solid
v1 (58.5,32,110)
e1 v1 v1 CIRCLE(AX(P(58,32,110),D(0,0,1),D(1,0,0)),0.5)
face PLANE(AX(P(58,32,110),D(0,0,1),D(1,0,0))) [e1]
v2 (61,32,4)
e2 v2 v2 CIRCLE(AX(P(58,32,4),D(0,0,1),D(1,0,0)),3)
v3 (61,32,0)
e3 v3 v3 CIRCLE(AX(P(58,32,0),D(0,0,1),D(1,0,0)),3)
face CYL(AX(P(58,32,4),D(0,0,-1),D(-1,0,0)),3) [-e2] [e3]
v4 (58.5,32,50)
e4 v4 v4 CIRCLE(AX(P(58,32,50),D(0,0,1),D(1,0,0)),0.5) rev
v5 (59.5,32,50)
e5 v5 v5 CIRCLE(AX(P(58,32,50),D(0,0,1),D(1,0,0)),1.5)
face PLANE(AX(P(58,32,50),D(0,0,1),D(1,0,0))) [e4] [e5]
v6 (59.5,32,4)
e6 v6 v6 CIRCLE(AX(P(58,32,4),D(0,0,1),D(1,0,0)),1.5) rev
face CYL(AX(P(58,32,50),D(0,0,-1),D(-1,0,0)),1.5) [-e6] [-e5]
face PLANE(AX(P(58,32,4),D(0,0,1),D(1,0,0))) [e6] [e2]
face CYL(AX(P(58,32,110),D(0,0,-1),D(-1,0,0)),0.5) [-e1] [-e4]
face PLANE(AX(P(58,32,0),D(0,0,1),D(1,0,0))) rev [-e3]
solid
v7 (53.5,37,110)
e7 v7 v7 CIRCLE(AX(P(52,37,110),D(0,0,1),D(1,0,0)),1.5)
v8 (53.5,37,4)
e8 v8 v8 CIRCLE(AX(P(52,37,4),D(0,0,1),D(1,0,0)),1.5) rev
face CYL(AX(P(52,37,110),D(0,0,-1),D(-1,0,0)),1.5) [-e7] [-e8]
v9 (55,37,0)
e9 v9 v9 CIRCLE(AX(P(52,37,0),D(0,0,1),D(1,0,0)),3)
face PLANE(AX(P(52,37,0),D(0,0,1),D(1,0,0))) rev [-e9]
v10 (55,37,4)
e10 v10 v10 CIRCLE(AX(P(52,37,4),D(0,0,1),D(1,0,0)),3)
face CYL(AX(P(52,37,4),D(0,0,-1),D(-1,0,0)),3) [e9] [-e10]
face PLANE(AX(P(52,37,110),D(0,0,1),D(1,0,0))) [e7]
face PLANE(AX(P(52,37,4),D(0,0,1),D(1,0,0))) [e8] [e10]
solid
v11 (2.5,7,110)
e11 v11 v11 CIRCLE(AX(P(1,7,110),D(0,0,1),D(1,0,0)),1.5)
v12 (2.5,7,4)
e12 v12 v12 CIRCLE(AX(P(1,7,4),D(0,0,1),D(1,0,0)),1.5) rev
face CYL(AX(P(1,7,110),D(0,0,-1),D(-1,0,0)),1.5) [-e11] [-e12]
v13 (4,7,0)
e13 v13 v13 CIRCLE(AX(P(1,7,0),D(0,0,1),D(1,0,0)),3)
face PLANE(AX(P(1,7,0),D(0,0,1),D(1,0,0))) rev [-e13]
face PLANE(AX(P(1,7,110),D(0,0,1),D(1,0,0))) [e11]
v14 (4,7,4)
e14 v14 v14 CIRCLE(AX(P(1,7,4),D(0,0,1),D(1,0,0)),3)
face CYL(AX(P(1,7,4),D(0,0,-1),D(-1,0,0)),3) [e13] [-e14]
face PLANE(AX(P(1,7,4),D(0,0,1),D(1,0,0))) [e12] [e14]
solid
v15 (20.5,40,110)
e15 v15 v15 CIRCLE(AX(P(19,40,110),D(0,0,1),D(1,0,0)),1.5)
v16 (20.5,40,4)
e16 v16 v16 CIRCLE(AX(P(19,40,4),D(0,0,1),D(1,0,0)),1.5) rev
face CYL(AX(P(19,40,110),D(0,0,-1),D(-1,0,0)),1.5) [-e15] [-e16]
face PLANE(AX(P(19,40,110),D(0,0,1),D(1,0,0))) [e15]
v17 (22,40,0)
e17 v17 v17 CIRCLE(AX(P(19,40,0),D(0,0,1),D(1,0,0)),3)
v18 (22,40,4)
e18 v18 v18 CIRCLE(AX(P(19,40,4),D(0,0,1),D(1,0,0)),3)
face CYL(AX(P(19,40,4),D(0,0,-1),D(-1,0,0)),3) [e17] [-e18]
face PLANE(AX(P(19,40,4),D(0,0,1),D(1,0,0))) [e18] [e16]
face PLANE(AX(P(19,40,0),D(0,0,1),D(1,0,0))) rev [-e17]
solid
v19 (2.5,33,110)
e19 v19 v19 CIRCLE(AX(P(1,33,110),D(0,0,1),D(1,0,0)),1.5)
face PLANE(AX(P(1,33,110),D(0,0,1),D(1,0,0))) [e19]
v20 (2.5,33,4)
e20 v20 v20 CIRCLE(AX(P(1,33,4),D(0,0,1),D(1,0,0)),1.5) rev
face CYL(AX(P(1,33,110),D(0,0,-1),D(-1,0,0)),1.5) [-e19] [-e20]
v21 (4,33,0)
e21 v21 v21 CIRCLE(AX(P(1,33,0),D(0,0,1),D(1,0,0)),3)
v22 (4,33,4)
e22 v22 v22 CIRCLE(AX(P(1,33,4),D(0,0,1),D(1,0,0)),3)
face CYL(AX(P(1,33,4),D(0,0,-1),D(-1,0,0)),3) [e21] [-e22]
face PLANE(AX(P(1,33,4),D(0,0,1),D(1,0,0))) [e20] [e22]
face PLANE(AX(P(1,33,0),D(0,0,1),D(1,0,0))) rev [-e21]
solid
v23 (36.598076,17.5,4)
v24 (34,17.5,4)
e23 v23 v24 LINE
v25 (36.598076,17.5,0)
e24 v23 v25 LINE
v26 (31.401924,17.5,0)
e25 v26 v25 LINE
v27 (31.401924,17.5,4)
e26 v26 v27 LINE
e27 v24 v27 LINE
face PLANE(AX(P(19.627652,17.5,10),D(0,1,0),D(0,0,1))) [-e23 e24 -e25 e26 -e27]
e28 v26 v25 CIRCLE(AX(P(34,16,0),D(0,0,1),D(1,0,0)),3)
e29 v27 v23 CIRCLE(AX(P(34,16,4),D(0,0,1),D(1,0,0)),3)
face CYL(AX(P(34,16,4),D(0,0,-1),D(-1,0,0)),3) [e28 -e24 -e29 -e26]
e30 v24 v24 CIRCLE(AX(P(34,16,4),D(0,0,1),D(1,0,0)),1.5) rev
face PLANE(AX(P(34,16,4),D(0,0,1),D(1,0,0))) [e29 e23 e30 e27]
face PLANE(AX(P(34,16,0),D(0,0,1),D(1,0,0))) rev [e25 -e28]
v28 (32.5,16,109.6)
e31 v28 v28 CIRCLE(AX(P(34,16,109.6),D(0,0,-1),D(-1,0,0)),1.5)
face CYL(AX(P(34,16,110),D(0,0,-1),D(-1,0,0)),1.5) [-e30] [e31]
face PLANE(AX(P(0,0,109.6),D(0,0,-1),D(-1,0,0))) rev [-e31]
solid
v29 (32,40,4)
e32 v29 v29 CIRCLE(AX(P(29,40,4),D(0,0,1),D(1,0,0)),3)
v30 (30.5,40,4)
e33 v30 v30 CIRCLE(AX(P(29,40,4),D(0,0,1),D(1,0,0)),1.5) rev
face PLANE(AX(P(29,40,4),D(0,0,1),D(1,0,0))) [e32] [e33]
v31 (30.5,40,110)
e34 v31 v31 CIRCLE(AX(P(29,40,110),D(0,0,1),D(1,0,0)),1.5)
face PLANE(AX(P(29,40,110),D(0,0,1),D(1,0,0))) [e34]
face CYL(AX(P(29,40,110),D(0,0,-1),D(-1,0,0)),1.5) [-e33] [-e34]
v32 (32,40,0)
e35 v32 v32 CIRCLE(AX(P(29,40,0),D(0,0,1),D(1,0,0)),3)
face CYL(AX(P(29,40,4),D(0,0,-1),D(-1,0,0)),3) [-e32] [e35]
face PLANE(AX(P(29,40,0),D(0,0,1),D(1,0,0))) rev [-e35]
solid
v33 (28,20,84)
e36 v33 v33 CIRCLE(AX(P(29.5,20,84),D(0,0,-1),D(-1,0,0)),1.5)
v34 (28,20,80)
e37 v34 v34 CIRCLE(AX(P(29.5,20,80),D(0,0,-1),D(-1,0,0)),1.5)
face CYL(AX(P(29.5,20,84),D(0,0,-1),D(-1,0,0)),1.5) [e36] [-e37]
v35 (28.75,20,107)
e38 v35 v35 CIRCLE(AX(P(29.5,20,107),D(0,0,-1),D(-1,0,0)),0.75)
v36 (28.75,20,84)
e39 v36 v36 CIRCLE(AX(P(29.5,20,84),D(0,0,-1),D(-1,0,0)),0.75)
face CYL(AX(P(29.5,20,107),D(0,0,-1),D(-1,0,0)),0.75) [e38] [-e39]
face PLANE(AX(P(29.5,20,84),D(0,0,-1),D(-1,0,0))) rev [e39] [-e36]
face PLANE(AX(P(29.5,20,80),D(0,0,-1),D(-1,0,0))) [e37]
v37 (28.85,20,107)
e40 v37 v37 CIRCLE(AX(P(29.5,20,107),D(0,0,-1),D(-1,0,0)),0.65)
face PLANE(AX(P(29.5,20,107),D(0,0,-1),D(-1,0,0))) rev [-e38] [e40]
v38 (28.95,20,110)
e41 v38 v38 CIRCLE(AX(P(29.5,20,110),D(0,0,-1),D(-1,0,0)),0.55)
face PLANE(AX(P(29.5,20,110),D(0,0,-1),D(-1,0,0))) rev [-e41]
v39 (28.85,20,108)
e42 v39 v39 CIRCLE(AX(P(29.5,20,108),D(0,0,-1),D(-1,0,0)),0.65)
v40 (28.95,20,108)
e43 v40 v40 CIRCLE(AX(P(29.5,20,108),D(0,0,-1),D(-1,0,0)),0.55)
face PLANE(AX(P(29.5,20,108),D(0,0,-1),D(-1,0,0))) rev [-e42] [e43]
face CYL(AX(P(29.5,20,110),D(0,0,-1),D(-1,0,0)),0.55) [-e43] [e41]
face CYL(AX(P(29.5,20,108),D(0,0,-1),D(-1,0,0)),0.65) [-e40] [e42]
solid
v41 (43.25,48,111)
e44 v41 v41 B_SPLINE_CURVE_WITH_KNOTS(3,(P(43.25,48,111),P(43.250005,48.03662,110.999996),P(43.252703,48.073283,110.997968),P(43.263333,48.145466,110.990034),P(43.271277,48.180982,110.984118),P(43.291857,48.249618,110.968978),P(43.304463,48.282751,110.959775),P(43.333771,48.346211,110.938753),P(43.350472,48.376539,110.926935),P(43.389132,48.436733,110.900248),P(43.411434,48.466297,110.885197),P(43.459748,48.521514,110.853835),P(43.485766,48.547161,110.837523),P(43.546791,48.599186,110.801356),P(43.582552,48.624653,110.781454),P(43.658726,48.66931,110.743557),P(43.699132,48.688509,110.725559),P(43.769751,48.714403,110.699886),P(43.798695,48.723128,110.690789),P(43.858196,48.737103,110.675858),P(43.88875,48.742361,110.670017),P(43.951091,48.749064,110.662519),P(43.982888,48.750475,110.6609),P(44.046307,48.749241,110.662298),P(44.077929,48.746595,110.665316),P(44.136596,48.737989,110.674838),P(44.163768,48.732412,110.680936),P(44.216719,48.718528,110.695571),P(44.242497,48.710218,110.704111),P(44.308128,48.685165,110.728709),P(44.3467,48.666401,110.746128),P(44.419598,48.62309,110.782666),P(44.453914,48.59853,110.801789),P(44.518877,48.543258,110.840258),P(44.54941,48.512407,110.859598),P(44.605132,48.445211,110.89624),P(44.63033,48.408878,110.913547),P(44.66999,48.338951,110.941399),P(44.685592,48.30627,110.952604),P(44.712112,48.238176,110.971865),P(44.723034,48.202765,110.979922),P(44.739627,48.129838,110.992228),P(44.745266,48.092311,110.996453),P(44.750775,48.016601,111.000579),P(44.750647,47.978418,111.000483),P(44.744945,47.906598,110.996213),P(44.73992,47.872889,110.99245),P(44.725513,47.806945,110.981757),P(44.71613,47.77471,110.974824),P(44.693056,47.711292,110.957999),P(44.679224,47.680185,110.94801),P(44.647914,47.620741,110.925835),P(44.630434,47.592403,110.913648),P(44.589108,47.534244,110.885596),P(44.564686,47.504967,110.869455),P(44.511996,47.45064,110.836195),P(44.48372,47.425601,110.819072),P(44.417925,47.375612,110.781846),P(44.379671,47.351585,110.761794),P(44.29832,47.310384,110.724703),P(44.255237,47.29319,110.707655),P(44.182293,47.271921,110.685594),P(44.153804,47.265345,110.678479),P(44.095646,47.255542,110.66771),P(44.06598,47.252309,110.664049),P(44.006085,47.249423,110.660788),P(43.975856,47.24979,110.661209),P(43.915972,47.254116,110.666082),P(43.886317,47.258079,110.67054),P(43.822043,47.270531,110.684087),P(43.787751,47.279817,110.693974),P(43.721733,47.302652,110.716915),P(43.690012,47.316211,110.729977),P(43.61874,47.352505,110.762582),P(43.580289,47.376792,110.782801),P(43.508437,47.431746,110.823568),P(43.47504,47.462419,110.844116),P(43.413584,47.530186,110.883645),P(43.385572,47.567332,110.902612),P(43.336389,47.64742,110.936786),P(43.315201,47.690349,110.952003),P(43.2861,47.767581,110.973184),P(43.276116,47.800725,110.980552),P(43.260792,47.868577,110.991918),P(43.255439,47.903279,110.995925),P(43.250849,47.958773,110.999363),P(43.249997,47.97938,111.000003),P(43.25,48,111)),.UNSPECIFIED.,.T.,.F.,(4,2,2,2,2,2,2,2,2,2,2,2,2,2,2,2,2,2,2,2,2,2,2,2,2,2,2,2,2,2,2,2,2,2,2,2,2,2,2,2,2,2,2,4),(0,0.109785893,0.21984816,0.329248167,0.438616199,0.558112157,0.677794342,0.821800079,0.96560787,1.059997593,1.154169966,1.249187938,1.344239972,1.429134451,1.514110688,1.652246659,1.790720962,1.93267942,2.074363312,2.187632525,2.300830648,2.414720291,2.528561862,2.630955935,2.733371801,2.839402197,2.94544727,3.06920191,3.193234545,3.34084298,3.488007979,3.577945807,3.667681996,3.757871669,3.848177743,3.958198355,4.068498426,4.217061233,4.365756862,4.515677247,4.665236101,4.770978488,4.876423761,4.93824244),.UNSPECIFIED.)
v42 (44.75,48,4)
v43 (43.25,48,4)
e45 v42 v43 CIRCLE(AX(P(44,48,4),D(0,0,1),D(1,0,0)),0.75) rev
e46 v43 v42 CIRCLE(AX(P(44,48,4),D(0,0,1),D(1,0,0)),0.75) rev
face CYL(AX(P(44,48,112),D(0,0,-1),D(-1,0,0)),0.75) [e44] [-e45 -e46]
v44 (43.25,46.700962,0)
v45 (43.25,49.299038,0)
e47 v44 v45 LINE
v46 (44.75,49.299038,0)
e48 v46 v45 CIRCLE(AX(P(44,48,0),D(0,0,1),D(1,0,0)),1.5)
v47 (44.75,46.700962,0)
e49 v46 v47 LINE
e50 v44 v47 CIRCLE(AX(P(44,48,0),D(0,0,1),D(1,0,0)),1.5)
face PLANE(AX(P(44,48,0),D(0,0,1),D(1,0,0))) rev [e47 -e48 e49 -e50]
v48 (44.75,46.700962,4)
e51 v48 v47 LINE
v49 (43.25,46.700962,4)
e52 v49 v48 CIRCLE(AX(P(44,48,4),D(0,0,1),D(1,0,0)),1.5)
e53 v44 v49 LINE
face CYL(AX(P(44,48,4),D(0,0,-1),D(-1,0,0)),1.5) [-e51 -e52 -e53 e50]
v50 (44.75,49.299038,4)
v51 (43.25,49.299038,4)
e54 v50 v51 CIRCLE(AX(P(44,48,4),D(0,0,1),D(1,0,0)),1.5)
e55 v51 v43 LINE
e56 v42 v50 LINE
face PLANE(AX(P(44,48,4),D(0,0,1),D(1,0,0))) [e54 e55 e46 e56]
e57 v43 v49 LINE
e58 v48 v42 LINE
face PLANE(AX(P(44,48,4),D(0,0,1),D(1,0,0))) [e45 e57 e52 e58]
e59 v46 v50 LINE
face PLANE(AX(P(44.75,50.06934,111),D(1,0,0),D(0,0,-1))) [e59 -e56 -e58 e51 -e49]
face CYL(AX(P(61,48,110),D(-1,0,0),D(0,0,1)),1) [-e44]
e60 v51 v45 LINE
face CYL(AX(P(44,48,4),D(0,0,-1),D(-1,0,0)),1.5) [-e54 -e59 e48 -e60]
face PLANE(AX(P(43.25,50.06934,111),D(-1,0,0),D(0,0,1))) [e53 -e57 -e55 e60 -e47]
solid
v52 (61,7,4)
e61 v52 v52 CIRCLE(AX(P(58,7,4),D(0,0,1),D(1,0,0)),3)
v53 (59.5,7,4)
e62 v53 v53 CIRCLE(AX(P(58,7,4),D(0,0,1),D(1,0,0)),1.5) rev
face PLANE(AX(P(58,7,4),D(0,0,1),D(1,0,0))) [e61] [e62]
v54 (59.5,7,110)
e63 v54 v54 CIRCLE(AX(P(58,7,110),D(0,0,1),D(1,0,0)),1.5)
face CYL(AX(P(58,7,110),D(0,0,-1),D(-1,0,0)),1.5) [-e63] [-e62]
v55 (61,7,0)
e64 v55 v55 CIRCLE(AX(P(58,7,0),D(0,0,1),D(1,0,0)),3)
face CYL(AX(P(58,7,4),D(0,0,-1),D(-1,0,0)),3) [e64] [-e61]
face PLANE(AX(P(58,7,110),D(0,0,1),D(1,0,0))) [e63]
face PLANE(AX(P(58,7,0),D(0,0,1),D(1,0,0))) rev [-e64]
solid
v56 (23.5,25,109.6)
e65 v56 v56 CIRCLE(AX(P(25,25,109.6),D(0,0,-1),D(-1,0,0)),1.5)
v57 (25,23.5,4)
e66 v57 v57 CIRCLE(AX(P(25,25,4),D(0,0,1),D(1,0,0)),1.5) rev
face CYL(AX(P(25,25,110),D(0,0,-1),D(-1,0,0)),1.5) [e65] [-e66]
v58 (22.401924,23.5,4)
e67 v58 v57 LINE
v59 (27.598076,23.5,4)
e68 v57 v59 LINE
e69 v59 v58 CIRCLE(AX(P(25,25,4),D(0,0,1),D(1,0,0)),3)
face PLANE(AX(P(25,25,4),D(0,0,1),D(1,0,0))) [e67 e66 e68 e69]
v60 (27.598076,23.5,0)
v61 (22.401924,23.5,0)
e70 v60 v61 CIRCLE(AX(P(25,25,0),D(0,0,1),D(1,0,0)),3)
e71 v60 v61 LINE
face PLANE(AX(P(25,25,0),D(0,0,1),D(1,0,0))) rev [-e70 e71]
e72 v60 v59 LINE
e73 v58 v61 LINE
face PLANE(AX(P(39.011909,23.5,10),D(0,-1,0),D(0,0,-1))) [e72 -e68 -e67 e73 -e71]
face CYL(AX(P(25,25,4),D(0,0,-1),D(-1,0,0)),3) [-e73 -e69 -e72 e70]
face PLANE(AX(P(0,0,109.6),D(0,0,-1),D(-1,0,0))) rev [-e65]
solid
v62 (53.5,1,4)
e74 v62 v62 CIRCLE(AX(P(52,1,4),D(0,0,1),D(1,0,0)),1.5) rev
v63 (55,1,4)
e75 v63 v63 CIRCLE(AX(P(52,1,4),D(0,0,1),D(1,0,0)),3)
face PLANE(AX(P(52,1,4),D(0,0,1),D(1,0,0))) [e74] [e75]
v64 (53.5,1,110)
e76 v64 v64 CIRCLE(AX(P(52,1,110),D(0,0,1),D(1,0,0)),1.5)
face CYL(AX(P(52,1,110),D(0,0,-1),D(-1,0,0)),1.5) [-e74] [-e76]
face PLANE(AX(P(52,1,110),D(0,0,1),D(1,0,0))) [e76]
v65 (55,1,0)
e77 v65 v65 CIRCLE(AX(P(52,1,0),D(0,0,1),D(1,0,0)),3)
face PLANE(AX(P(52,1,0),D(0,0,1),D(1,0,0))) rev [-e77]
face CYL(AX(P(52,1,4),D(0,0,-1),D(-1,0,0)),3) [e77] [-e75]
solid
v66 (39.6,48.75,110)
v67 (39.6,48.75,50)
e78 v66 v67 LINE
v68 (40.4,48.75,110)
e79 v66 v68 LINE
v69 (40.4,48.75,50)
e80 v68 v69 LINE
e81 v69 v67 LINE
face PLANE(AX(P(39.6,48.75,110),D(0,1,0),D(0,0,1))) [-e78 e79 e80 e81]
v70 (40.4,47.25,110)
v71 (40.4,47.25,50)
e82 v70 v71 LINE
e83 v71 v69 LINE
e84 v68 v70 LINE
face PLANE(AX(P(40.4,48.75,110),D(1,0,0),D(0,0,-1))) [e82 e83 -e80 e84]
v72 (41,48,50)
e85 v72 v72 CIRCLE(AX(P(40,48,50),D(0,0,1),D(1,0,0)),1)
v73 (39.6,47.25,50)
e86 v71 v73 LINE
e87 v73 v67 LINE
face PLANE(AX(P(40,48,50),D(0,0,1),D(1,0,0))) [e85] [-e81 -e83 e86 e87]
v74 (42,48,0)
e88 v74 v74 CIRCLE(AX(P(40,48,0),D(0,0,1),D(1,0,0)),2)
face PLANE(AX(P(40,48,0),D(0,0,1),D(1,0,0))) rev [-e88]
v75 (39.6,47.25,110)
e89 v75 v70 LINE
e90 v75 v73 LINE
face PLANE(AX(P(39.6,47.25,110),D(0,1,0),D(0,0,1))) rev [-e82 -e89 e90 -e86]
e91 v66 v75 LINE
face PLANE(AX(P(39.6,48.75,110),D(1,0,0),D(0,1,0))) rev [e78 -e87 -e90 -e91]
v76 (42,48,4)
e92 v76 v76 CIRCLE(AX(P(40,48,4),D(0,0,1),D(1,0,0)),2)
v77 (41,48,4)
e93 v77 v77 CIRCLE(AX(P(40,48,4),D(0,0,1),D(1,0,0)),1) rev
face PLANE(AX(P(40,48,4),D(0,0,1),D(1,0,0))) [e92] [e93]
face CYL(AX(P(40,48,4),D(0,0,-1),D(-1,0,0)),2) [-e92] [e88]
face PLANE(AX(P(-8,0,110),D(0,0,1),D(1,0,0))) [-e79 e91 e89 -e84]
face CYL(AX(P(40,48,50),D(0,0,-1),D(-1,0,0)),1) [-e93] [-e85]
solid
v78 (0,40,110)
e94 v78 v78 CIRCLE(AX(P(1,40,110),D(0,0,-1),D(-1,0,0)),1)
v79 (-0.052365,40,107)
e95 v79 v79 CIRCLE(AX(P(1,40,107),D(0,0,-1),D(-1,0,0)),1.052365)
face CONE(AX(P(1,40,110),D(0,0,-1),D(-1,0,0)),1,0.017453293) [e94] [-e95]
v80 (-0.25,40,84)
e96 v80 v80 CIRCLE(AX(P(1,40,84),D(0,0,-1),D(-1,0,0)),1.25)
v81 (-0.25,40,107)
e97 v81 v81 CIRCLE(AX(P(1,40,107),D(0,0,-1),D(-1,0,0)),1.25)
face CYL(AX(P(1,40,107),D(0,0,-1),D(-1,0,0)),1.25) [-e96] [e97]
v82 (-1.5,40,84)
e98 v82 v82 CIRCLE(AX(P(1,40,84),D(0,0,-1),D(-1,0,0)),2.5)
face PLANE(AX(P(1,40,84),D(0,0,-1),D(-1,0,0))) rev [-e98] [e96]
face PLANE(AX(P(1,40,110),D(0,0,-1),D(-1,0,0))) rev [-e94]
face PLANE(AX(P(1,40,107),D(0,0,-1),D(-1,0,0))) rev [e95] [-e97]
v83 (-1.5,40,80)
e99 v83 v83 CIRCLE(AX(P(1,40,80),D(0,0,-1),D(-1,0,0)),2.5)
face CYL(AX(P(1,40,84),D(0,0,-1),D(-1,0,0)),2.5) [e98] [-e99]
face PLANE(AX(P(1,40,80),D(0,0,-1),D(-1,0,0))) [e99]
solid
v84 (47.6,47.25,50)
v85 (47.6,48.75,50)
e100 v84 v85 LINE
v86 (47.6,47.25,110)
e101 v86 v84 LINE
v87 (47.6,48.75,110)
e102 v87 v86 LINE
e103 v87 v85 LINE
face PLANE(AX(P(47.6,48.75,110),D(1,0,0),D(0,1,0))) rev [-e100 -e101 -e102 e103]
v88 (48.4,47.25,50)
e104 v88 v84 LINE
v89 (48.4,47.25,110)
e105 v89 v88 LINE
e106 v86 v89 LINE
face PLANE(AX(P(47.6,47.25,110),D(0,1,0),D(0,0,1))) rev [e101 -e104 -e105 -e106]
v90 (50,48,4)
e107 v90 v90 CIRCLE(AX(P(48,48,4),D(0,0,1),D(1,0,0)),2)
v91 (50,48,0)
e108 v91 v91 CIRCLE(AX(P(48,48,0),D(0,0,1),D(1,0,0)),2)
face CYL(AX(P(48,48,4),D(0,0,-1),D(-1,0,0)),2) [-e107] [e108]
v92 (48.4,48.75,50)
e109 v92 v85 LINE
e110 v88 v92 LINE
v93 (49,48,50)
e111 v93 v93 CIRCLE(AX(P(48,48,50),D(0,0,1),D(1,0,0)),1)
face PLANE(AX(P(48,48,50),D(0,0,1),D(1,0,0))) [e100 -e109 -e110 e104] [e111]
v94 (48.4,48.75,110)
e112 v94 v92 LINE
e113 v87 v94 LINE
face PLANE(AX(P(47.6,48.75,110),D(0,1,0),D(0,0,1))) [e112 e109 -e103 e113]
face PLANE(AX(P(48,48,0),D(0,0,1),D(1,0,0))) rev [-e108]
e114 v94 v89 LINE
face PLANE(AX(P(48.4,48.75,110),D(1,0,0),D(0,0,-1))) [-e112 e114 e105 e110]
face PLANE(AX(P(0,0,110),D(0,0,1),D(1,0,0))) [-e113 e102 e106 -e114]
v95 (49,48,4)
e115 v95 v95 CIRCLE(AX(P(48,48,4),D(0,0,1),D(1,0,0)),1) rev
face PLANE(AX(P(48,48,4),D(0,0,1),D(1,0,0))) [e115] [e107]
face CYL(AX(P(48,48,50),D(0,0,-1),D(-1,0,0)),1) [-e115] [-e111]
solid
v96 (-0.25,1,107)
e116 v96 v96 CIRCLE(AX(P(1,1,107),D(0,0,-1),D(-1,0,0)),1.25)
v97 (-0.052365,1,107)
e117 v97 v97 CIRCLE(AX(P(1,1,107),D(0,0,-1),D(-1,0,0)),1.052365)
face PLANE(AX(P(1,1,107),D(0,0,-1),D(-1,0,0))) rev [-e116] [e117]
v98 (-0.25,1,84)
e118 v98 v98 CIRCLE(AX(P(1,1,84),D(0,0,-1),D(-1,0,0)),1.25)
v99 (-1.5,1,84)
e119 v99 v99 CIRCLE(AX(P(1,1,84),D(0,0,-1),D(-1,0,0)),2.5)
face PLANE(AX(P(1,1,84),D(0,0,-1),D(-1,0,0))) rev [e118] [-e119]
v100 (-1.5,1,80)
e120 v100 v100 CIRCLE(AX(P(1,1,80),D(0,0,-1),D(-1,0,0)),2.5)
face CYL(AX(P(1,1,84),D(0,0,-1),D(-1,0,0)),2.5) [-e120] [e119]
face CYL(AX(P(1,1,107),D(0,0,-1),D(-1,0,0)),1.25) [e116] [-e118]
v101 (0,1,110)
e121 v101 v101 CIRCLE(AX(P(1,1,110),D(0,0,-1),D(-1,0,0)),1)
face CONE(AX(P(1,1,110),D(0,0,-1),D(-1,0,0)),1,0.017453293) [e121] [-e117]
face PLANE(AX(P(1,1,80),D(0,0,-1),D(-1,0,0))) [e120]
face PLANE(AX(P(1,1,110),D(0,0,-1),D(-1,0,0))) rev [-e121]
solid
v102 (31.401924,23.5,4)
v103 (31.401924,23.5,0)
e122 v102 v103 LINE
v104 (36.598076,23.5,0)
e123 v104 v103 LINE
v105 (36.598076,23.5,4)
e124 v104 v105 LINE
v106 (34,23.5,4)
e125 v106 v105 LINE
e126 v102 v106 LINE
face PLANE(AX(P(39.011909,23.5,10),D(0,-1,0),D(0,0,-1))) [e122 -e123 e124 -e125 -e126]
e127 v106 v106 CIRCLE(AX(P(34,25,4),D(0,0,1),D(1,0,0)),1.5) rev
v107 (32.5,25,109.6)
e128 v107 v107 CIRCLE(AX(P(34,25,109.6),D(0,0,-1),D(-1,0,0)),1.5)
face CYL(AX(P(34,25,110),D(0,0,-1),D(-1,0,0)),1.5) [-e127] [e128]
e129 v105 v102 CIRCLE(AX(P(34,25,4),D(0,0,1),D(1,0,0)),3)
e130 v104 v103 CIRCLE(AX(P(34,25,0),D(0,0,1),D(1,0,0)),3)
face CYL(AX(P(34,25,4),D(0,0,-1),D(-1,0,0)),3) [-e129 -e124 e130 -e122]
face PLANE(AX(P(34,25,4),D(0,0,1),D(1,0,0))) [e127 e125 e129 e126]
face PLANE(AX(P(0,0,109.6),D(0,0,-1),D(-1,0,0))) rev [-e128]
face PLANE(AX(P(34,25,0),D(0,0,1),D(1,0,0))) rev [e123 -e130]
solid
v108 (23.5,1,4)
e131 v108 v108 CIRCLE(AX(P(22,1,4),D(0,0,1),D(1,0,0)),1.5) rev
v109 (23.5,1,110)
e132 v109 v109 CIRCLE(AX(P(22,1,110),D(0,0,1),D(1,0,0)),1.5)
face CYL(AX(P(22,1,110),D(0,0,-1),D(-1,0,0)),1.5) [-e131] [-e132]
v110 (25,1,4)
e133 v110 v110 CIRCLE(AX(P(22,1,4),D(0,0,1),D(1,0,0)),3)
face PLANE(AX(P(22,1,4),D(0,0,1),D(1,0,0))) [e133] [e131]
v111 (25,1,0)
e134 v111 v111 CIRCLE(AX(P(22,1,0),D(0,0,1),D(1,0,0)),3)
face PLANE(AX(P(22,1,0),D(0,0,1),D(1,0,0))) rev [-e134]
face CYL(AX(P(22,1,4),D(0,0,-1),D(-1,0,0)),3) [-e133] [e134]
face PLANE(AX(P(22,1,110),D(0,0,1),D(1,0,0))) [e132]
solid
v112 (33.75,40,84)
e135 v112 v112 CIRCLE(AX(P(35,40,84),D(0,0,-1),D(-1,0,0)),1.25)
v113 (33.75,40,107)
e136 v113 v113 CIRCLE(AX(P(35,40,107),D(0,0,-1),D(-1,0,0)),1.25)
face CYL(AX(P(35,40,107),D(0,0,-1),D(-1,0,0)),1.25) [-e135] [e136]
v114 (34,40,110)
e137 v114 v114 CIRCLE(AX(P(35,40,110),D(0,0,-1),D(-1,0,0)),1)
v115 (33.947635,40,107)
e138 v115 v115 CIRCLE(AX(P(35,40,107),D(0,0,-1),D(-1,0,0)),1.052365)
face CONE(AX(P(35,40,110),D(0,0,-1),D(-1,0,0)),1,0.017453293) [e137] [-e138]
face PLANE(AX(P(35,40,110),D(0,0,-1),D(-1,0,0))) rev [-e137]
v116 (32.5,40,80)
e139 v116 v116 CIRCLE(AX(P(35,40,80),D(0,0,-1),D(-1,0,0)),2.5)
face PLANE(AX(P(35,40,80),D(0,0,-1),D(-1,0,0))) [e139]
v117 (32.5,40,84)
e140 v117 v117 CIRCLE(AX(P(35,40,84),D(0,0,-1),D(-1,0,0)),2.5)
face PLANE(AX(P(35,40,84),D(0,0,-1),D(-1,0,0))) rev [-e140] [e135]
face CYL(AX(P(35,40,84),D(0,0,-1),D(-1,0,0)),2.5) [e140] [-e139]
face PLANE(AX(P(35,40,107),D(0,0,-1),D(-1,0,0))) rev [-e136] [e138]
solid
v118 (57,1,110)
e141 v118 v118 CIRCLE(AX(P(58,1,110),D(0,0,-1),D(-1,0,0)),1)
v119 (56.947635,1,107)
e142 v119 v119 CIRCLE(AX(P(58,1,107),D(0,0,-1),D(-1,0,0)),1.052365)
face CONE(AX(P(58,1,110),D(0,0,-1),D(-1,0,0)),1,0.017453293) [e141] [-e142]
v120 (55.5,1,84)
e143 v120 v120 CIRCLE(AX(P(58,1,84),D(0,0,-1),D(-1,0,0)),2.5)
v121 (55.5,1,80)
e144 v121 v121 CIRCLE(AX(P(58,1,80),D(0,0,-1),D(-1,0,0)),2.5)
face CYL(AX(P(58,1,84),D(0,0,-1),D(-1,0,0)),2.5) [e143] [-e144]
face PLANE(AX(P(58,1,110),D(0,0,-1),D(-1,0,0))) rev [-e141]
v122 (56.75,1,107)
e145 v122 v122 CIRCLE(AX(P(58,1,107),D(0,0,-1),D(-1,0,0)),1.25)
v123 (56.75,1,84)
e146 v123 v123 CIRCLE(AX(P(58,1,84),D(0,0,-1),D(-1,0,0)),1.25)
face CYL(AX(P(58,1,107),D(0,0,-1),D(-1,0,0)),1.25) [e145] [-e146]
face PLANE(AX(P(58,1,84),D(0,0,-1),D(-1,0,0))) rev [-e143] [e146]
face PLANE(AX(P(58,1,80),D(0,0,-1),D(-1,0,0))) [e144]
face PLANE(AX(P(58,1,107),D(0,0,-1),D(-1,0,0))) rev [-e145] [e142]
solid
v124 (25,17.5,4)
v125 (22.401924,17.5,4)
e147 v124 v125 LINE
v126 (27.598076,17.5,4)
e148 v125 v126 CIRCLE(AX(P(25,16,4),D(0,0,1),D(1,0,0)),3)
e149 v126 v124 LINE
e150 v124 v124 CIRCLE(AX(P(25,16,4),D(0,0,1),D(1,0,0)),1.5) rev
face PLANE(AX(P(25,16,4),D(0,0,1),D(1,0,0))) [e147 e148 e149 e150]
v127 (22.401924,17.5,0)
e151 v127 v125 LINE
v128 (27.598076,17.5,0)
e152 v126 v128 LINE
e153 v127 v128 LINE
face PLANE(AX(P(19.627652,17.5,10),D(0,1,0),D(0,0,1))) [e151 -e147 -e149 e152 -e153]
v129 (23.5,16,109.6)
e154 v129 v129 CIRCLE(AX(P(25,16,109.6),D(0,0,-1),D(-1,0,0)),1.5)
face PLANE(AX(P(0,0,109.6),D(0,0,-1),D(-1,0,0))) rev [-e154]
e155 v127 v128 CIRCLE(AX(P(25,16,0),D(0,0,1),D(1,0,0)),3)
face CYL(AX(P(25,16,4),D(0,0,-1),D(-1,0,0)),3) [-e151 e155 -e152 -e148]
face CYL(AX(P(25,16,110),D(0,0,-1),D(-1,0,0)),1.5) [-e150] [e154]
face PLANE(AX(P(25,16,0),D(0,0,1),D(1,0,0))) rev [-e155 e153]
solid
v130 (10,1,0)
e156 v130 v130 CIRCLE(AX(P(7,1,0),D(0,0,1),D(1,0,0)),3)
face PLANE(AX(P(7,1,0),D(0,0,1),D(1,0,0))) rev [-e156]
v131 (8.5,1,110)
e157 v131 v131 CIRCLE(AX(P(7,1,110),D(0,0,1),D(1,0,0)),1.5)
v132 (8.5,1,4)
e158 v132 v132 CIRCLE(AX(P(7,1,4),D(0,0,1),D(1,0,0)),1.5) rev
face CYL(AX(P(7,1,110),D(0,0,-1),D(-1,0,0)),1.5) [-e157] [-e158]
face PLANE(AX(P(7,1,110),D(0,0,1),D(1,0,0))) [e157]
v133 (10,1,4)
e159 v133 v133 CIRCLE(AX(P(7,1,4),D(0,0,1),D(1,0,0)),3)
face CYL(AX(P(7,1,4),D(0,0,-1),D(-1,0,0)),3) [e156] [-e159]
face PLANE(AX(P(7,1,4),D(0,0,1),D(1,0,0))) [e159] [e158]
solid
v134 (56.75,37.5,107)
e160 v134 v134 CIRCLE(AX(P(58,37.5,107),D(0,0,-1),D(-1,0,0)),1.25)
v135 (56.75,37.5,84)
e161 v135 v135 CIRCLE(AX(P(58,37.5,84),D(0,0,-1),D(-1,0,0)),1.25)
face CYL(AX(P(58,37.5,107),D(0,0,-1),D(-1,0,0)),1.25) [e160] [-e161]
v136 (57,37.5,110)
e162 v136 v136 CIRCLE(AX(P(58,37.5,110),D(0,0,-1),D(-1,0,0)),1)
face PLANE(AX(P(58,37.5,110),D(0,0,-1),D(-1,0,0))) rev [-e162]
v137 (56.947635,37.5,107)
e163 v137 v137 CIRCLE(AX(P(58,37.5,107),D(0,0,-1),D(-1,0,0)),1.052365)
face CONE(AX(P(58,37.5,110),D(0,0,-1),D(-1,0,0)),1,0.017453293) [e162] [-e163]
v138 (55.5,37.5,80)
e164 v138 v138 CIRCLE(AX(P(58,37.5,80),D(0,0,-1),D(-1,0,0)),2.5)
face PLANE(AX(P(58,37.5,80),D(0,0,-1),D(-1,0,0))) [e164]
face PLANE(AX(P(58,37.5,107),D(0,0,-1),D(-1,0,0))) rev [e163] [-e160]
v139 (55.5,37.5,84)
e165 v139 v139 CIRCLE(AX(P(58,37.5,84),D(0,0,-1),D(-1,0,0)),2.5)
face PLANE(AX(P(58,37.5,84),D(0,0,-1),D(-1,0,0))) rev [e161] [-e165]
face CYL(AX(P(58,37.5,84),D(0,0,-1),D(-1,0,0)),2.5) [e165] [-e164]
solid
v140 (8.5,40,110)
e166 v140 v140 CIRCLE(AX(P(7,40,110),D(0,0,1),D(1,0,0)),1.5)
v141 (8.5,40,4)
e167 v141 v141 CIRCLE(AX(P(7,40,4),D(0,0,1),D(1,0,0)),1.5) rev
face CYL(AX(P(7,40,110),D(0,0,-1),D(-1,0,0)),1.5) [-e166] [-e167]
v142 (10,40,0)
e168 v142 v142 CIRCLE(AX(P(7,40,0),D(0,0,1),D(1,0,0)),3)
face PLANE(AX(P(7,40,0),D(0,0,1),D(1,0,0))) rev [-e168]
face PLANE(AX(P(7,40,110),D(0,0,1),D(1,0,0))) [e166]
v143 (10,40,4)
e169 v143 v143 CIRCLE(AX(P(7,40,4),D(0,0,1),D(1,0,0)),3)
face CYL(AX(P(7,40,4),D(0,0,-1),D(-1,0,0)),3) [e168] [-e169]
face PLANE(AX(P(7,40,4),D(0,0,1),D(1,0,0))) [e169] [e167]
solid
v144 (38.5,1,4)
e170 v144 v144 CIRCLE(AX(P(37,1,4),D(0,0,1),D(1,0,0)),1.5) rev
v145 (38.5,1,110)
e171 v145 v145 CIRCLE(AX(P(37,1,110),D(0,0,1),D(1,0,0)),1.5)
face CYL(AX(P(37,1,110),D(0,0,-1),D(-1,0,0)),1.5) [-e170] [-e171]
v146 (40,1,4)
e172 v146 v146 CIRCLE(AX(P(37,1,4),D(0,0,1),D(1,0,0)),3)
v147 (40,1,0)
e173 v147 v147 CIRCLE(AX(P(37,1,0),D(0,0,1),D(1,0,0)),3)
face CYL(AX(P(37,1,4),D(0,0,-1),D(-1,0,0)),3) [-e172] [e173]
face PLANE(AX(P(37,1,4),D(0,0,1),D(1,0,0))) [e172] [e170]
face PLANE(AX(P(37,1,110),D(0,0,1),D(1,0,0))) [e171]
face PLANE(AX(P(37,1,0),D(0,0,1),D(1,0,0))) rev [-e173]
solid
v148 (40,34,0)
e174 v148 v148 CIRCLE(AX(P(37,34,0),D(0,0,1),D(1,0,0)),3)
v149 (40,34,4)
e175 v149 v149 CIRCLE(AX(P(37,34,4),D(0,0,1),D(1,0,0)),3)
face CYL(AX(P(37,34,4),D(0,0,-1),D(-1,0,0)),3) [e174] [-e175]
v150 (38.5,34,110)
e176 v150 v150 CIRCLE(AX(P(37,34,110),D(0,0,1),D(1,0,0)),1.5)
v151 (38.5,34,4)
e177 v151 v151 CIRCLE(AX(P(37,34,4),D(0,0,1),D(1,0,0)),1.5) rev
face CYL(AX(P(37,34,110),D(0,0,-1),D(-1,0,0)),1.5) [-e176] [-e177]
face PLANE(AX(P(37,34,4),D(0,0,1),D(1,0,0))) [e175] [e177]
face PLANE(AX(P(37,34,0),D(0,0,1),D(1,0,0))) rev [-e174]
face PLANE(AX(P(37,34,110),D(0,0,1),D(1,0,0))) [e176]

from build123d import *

# Parameters (mm, degrees)
SKETCH_1_R                     = 3
EXTRUDE_1_DEPTH                = 4
SKETCH_2_R                     = 1.5
EXTRUDE_2_DEPTH                = 110
PATTERN_SKETCH_1_OUTLINE_R     = 1.5
PATTERN_SKETCH_1_DEPTH         = 110
PATTERN_SKETCH_1_2_OUTLINE_R   = 3
PATTERN_SKETCH_1_2_OUTLINE_R_2 = 1.5
PATTERN_SKETCH_1_2_DEPTH       = 4
SKETCH_4_R                     = 3
EXTRUDE_3_DEPTH                = 4
SKETCH_5_R                     = 1.5
EXTRUDE_4_DEPTH                = 50
SKETCH_8_R                     = 0.5
EXTRUDE_5_DEPTH                = 110
SKETCH_6_W                     = 40
SKETCH_6_H                     = 20
CUT_EXTRUDE_1_DEPTH            = 0.4
SKETCH_35_W                    = 19.384257682
SKETCH_35_H                    = 6
CUT_EXTRUDE_10_DEPTH           = 10
SKETCH_20_R                    = 2.5
EXTRUDE_8_DEPTH                = 4
SKETCH_19_R                    = 1.25
EXTRUDE_9_DEPTH                = 27
SKETCH_21_R                    = 1
EXTRUDE_10_DEPTH               = 30
DRAFT_1_ANGLE                  = 1
SKETCH_23_R                    = 1.5
EXTRUDE_11_DEPTH               = 4
SKETCH_24_R                    = 0.75
EXTRUDE_12_DEPTH               = 112
CUT_EXTRUDE_8_DEPTH            = 137.803691471
SKETCH_25_R                    = 1.5
EXTRUDE_13_DEPTH               = 4
SKETCH_26_R                    = 0.75
EXTRUDE_14_DEPTH               = 27
SKETCH_27_R                    = 0.65
EXTRUDE_15_DEPTH               = 28
SKETCH_28_R                    = 0.55
EXTRUDE_16_DEPTH               = 30
SKETCH_30_R                    = 2
EXTRUDE_17_DEPTH               = 4
SKETCH_31_R                    = 1
EXTRUDE_18_DEPTH               = 50
SKETCH_32_W                    = 0.8
SKETCH_32_H                    = 1.5
EXTRUDE_19_DEPTH               = 110
PATTERN_SKETCH_4_OUTLINE_R     = 1
PATTERN_SKETCH_4_DEPTH         = 50
PATTERN_START                  = 50
PATTERN_SKETCH_4_2_OUTLINE_W   = 0.8
PATTERN_SKETCH_4_2_OUTLINE_H   = 1.5
PATTERN_SKETCH_4_2_DEPTH       = 60
PATTERN_SKETCH_4_3_OUTLINE_R   = 2
PATTERN_SKETCH_4_3_OUTLINE_R_2 = 1
PATTERN_SKETCH_4_3_DEPTH       = 4
CUT_EXTRUDE_START              = 76
CUT_EXTRUDE_9_DEPTH            = 4


# Read off the part's stored shape, not the designer's step: ｽｹｯﾁ-ﾊﾟﾀｰﾝ1, ｽｹｯﾁ-ﾊﾟﾀｰﾝ3, ｽｹｯﾁ-ﾊﾟﾀｰﾝ4, ｶｯﾄ - 押し出し9
with BuildPart() as part:
    # ｽｹｯﾁ1 → ﾎﾞｽ - 押し出し1 (new body)
    with BuildSketch(Plane.XY):
        with Locations((1, 7)):
            Circle(SKETCH_1_R)
    extrude(amount=EXTRUDE_1_DEPTH)

    # ｽｹｯﾁ2 → ﾎﾞｽ - 押し出し2 (add)
    with BuildSketch(Plane.XY):
        with Locations((1, 7)):
            Circle(SKETCH_2_R)
    extrude(amount=EXTRUDE_2_DEPTH)


with BuildPart() as body_2:
    # ｽｹｯﾁ-ﾊﾟﾀｰﾝ1 outline → ｽｹｯﾁ-ﾊﾟﾀｰﾝ1 (new body)
    with BuildSketch(Plane.XY):
        with Locations((1, 33)):
            Circle(PATTERN_SKETCH_1_OUTLINE_R)
        with Locations((34, 25)):
            Circle(PATTERN_SKETCH_1_OUTLINE_R)
        with Locations((34, 16)):
            Circle(PATTERN_SKETCH_1_OUTLINE_R)
        with Locations((25, 16)):
            Circle(PATTERN_SKETCH_1_OUTLINE_R)
        with Locations((37, 34)):
            Circle(PATTERN_SKETCH_1_OUTLINE_R)
        with Locations((25, 25)):
            Circle(PATTERN_SKETCH_1_OUTLINE_R)
        with Locations((58, 7)):
            Circle(PATTERN_SKETCH_1_OUTLINE_R)
        with Locations((52, 37)):
            Circle(PATTERN_SKETCH_1_OUTLINE_R)
        with Locations((29, 40)):
            Circle(PATTERN_SKETCH_1_OUTLINE_R)
        with Locations((19, 40)):
            Circle(PATTERN_SKETCH_1_OUTLINE_R)
        with Locations((7, 40)):
            Circle(PATTERN_SKETCH_1_OUTLINE_R)
        with Locations((52, 1)):
            Circle(PATTERN_SKETCH_1_OUTLINE_R)
        with Locations((37, 1)):
            Circle(PATTERN_SKETCH_1_OUTLINE_R)
        with Locations((22, 1)):
            Circle(PATTERN_SKETCH_1_OUTLINE_R)
        with Locations((7, 1)):
            Circle(PATTERN_SKETCH_1_OUTLINE_R)
    extrude(amount=PATTERN_SKETCH_1_DEPTH)

    # Pattern Sketch 1 2 outline → Pattern Sketch 1 2 (add)
    # profile 1 of 15: a face of its own
    with BuildSketch(Plane.XY):
        with Locations((1, 33)):
            Circle(PATTERN_SKETCH_1_2_OUTLINE_R)
        with Locations((1, 33)):
            Circle(PATTERN_SKETCH_1_2_OUTLINE_R_2, mode=Mode.SUBTRACT)
    # profile 2 of 15: a face of its own
    with BuildSketch(Plane.XY):
        with Locations((34, 25)):
            Circle(PATTERN_SKETCH_1_2_OUTLINE_R)
        with Locations((34, 25)):
            Circle(PATTERN_SKETCH_1_2_OUTLINE_R_2, mode=Mode.SUBTRACT)
    # profile 3 of 15: a face of its own
    with BuildSketch(Plane.XY):
        with Locations((34, 16)):
            Circle(PATTERN_SKETCH_1_2_OUTLINE_R)
        with Locations((34, 16)):
            Circle(PATTERN_SKETCH_1_2_OUTLINE_R_2, mode=Mode.SUBTRACT)
    # profile 4 of 15: a face of its own
    with BuildSketch(Plane.XY):
        with Locations((25, 16)):
            Circle(PATTERN_SKETCH_1_2_OUTLINE_R)
        with Locations((25, 16)):
            Circle(PATTERN_SKETCH_1_2_OUTLINE_R_2, mode=Mode.SUBTRACT)
    # profile 5 of 15: a face of its own
    with BuildSketch(Plane.XY):
        with Locations((37, 34)):
            Circle(PATTERN_SKETCH_1_2_OUTLINE_R)
        with Locations((37, 34)):
            Circle(PATTERN_SKETCH_1_2_OUTLINE_R_2, mode=Mode.SUBTRACT)
    # profile 6 of 15: a face of its own
    with BuildSketch(Plane.XY):
        with Locations((25, 25)):
            Circle(PATTERN_SKETCH_1_2_OUTLINE_R)
        with Locations((25, 25)):
            Circle(PATTERN_SKETCH_1_2_OUTLINE_R_2, mode=Mode.SUBTRACT)
    # profile 7 of 15: a face of its own
    with BuildSketch(Plane.XY):
        with Locations((58, 7)):
            Circle(PATTERN_SKETCH_1_2_OUTLINE_R)
        with Locations((58, 7)):
            Circle(PATTERN_SKETCH_1_2_OUTLINE_R_2, mode=Mode.SUBTRACT)
    # profile 8 of 15: a face of its own
    with BuildSketch(Plane.XY):
        with Locations((52, 37)):
            Circle(PATTERN_SKETCH_1_2_OUTLINE_R)
        with Locations((52, 37)):
            Circle(PATTERN_SKETCH_1_2_OUTLINE_R_2, mode=Mode.SUBTRACT)
    # profile 9 of 15: a face of its own
    with BuildSketch(Plane.XY):
        with Locations((29, 40)):
            Circle(PATTERN_SKETCH_1_2_OUTLINE_R)
        with Locations((29, 40)):
            Circle(PATTERN_SKETCH_1_2_OUTLINE_R_2, mode=Mode.SUBTRACT)
    # profile 10 of 15: a face of its own
    with BuildSketch(Plane.XY):
        with Locations((19, 40)):
            Circle(PATTERN_SKETCH_1_2_OUTLINE_R)
        with Locations((19, 40)):
            Circle(PATTERN_SKETCH_1_2_OUTLINE_R_2, mode=Mode.SUBTRACT)
    # profile 11 of 15: a face of its own
    with BuildSketch(Plane.XY):
        with Locations((7, 40)):
            Circle(PATTERN_SKETCH_1_2_OUTLINE_R)
        with Locations((7, 40)):
            Circle(PATTERN_SKETCH_1_2_OUTLINE_R_2, mode=Mode.SUBTRACT)
    # profile 12 of 15: a face of its own
    with BuildSketch(Plane.XY):
        with Locations((52, 1)):
            Circle(PATTERN_SKETCH_1_2_OUTLINE_R)
        with Locations((52, 1)):
            Circle(PATTERN_SKETCH_1_2_OUTLINE_R_2, mode=Mode.SUBTRACT)
    # profile 13 of 15: a face of its own
    with BuildSketch(Plane.XY):
        with Locations((37, 1)):
            Circle(PATTERN_SKETCH_1_2_OUTLINE_R)
        with Locations((37, 1)):
            Circle(PATTERN_SKETCH_1_2_OUTLINE_R_2, mode=Mode.SUBTRACT)
    # profile 14 of 15: a face of its own
    with BuildSketch(Plane.XY):
        with Locations((22, 1)):
            Circle(PATTERN_SKETCH_1_2_OUTLINE_R)
        with Locations((22, 1)):
            Circle(PATTERN_SKETCH_1_2_OUTLINE_R_2, mode=Mode.SUBTRACT)
    # profile 15 of 15: a face of its own
    with BuildSketch(Plane.XY):
        with Locations((7, 1)):
            Circle(PATTERN_SKETCH_1_2_OUTLINE_R)
        with Locations((7, 1)):
            Circle(PATTERN_SKETCH_1_2_OUTLINE_R_2, mode=Mode.SUBTRACT)
    extrude(amount=PATTERN_SKETCH_1_2_DEPTH)

    # ｽｹｯﾁ6 → ｶｯﾄ - 押し出し1 (cut)
    with BuildSketch(Plane.XY.offset(110)):
        with Locations((30, 20)):
            Rectangle(SKETCH_6_W, SKETCH_6_H)
    extrude(amount=-CUT_EXTRUDE_1_DEPTH, mode=Mode.SUBTRACT)

    # ｽｹｯﾁ35 → ｶｯﾄ - 押し出し10 (cut)
    with BuildSketch(Plane.XY):
        with Locations((29.319780458, 20.5)):
            Rectangle(SKETCH_35_W, SKETCH_35_H)
    extrude(amount=CUT_EXTRUDE_10_DEPTH, mode=Mode.SUBTRACT)


with BuildPart() as body_3:
    # ｽｹｯﾁ4 → ﾎﾞｽ - 押し出し3 (new body)
    with BuildSketch(Plane.XY):
        with Locations((58, 32)):
            Circle(SKETCH_4_R)
    extrude(amount=EXTRUDE_3_DEPTH)

    # ｽｹｯﾁ5 → ﾎﾞｽ - 押し出し4 (add)
    with BuildSketch(Plane.XY):
        with Locations((58, 32)):
            Circle(SKETCH_5_R)
    extrude(amount=EXTRUDE_4_DEPTH)

    # ｽｹｯﾁ8 → ﾎﾞｽ - 押し出し5 (add)
    with BuildSketch(Plane.XY):
        with Locations((58, 32)):
            Circle(SKETCH_8_R)
    extrude(amount=EXTRUDE_5_DEPTH)


with BuildPart() as body_4:
    # ｽｹｯﾁ20 → ﾎﾞｽ - 押し出し8 (new body)
    with BuildSketch(Plane(origin=(0, 0, 80), x_dir=(-1, 0, 0), z_dir=(0, 0, -1))):
        with Locations((-1, 1)):
            Circle(SKETCH_20_R)
    extrude(amount=-EXTRUDE_8_DEPTH)

    # ｽｹｯﾁ19 → ﾎﾞｽ - 押し出し9 (add)
    with BuildSketch(Plane(origin=(0, 0, 80), x_dir=(-1, 0, 0), z_dir=(0, 0, -1))):
        with Locations((-1, 1)):
            Circle(SKETCH_19_R)
    extrude(amount=-EXTRUDE_9_DEPTH)

    # ｽｹｯﾁ21 → ﾎﾞｽ - 押し出し10 (add)
    with BuildSketch(Plane(origin=(0, 0, 80), x_dir=(-1, 0, 0), z_dir=(0, 0, -1))):
        with Locations((-1, 1)):
            Circle(SKETCH_21_R)
    extrude(amount=-EXTRUDE_10_DEPTH)

    # 抜き勾配1
    draft_1_faces = [body_4.faces().sort_by_distance(p)[0] for p in [
        (2, 1, 108.5),
    ]]
    draft(draft_1_faces, Plane(origin=(1, 1, 110), x_dir=(1, 0, 0), z_dir=(0, 0, 1)), DRAFT_1_ANGLE)


with BuildPart() as body_5:
    # ｽｹｯﾁ-ﾊﾟﾀｰﾝ3 outline → ｽｹｯﾁ-ﾊﾟﾀｰﾝ3 (revolve)
    with BuildSketch(Plane(origin=(35, 40, 0), x_dir=(1, 0, 0), z_dir=(0, -1, 0))):
        Polygon((2.5, 80), (2.5, 84), (1.25, 84), (1.25, 107), (1.052365195, 107), (1, 110), (0, 110), (0, 80), align=None)
    revolve(axis=Axis((35, 40, 0), (0, 0, 1)))


with BuildPart() as body_6:
    # Pattern Sketch 3 2 outline → Pattern Sketch 3 2 (revolve)
    with BuildSketch(Plane(origin=(58, 1, 0), x_dir=(1, 0, 0), z_dir=(0, -1, 0))):
        Polygon((0, 80), (2.5, 80), (2.5, 84), (1.25, 84), (1.25, 107), (1.052365195, 107), (1, 110), (0, 110), align=None)
    revolve(axis=Axis((58, 1, 0), (0, 0, 1)))


with BuildPart() as body_7:
    # Pattern Sketch 3 3 outline → Pattern Sketch 3 3 (revolve)
    with BuildSketch(Plane(origin=(58, 37.5, 0), x_dir=(1, 0, 0), z_dir=(0, -1, 0))):
        Polygon((0, 80), (2.5, 80), (2.5, 84), (1.25, 84), (1.25, 107), (1.052365195, 107), (1, 110), (0, 110), align=None)
    revolve(axis=Axis((58, 37.5, 0), (0, 0, 1)))


with BuildPart() as body_8:
    # Pattern Sketch 3 4 outline → Pattern Sketch 3 4 (revolve)
    with BuildSketch(Plane(origin=(1, 40, 0), x_dir=(1, 0, 0), z_dir=(0, -1, 0))):
        Polygon((0, 80), (2.5, 80), (2.5, 84), (1.25, 84), (1.25, 107), (1.052365195, 107), (1, 110), (0, 110), align=None)
    revolve(axis=Axis((1, 40, 0), (0, 0, 1)))


with BuildPart() as body_9:
    # ｽｹｯﾁ23 → ﾎﾞｽ - 押し出し11 (new body)
    with BuildSketch(Plane.XY):
        with Locations((44, 48)):
            Circle(SKETCH_23_R)
    extrude(amount=EXTRUDE_11_DEPTH)

    # ｽｹｯﾁ24 → ﾎﾞｽ - 押し出し12 (add)
    with BuildSketch(Plane.XY):
        with Locations((44, 48)):
            Circle(SKETCH_24_R)
    extrude(amount=EXTRUDE_12_DEPTH)

    # ｽｹｯﾁ18 → ｶｯﾄ - 押し出し8 (cut, through all)
    with BuildSketch(Plane(origin=(0, 0, 0), x_dir=(0, 0, -1), z_dir=(1, 0, 0))):
        with BuildLine():
            Line((-110, 49), (-110, 53))
            Line((-110, 53), (-120, 53))
            Line((-120, 53), (-120, 43))
            Line((-120, 43), (-110, 43))
            Line((-110, 43), (-110, 47))
            ThreePointArc((-110, 47), (-111, 48), (-110, 49))
        make_face()
    extrude(amount=CUT_EXTRUDE_8_DEPTH, mode=Mode.SUBTRACT)

    # ｶｯﾄ - 押し出し9 outline → ｶｯﾄ - 押し出し9 (cut)
    with BuildSketch(Plane(origin=(0, 0, 80), x_dir=(-1, 0, 0), z_dir=(0, 0, -1)).offset(CUT_EXTRUDE_START)):
        with BuildLine():
            Line((-44.75, 46.700961894), (-44.75, 49.299038106))
            ThreePointArc((-44.75, 49.299038106), (-45.5, 48), (-44.75, 46.700961894))
        make_face()
        with BuildLine():
            ThreePointArc((-43.25, 46.700961894), (-42.5, 48), (-43.25, 49.299038106))
            Line((-43.25, 49.299038106), (-43.25, 46.700961894))
        make_face()
    extrude(amount=CUT_EXTRUDE_9_DEPTH, mode=Mode.SUBTRACT)


with BuildPart() as body_10:
    # ｽｹｯﾁ25 → ﾎﾞｽ - 押し出し13 (new body)
    with BuildSketch(Plane(origin=(0, 0, 80), x_dir=(-1, 0, 0), z_dir=(0, 0, -1))):
        with Locations((-29.5, 20)):
            Circle(SKETCH_25_R)
    extrude(amount=-EXTRUDE_13_DEPTH)

    # ｽｹｯﾁ26 → ﾎﾞｽ - 押し出し14 (add)
    with BuildSketch(Plane(origin=(0, 0, 80), x_dir=(-1, 0, 0), z_dir=(0, 0, -1))):
        with Locations((-29.5, 20)):
            Circle(SKETCH_26_R)
    extrude(amount=-EXTRUDE_14_DEPTH)

    # ｽｹｯﾁ27 → ﾎﾞｽ - 押し出し15 (add)
    with BuildSketch(Plane(origin=(0, 0, 80), x_dir=(-1, 0, 0), z_dir=(0, 0, -1))):
        with Locations((-29.5, 20)):
            Circle(SKETCH_27_R)
    extrude(amount=-EXTRUDE_15_DEPTH)

    # ｽｹｯﾁ28 → ﾎﾞｽ - 押し出し16 (add)
    with BuildSketch(Plane(origin=(0, 0, 80), x_dir=(-1, 0, 0), z_dir=(0, 0, -1))):
        with Locations((-29.5, 20)):
            Circle(SKETCH_28_R)
    extrude(amount=-EXTRUDE_16_DEPTH)


with BuildPart() as body_11:
    # ｽｹｯﾁ30 → ﾎﾞｽ - 押し出し17 (new body)
    with BuildSketch(Plane.XY):
        with Locations((48, 48)):
            Circle(SKETCH_30_R)
    extrude(amount=EXTRUDE_17_DEPTH)

    # ｽｹｯﾁ31 → ﾎﾞｽ - 押し出し18 (add)
    with BuildSketch(Plane.XY):
        with Locations((48, 48)):
            Circle(SKETCH_31_R)
    extrude(amount=EXTRUDE_18_DEPTH)

    # ｽｹｯﾁ32 → ﾎﾞｽ - 押し出し19 (add)
    with BuildSketch(Plane.XY):
        with Locations((48, 48)):
            Rectangle(SKETCH_32_W, SKETCH_32_H)
    extrude(amount=EXTRUDE_19_DEPTH)


with BuildPart() as body_12:
    # ｽｹｯﾁ-ﾊﾟﾀｰﾝ4 outline → ｽｹｯﾁ-ﾊﾟﾀｰﾝ4 (new body)
    with BuildSketch(Plane.XY):
        with Locations((40, 48)):
            Circle(PATTERN_SKETCH_4_OUTLINE_R)
    extrude(amount=PATTERN_SKETCH_4_DEPTH)

    # Pattern Sketch 4 2 outline → Pattern Sketch 4 2 (add)
    with BuildSketch(Plane.XY.offset(PATTERN_START)):
        with Locations((40, 48)):
            Rectangle(PATTERN_SKETCH_4_2_OUTLINE_W, PATTERN_SKETCH_4_2_OUTLINE_H)
    extrude(amount=PATTERN_SKETCH_4_2_DEPTH)

    # Pattern Sketch 4 3 outline → Pattern Sketch 4 3 (add)
    with BuildSketch(Plane.XY):
        with Locations((40, 48)):
            Circle(PATTERN_SKETCH_4_3_OUTLINE_R)
        with Locations((40, 48)):
            Circle(PATTERN_SKETCH_4_3_OUTLINE_R_2, mode=Mode.SUBTRACT)
    extrude(amount=PATTERN_SKETCH_4_3_DEPTH)


solid = Compound([part.part, body_2.part, body_3.part, body_4.part, body_5.part, body_6.part, body_7.part, body_8.part, body_9.part, body_10.part, body_11.part, body_12.part])
